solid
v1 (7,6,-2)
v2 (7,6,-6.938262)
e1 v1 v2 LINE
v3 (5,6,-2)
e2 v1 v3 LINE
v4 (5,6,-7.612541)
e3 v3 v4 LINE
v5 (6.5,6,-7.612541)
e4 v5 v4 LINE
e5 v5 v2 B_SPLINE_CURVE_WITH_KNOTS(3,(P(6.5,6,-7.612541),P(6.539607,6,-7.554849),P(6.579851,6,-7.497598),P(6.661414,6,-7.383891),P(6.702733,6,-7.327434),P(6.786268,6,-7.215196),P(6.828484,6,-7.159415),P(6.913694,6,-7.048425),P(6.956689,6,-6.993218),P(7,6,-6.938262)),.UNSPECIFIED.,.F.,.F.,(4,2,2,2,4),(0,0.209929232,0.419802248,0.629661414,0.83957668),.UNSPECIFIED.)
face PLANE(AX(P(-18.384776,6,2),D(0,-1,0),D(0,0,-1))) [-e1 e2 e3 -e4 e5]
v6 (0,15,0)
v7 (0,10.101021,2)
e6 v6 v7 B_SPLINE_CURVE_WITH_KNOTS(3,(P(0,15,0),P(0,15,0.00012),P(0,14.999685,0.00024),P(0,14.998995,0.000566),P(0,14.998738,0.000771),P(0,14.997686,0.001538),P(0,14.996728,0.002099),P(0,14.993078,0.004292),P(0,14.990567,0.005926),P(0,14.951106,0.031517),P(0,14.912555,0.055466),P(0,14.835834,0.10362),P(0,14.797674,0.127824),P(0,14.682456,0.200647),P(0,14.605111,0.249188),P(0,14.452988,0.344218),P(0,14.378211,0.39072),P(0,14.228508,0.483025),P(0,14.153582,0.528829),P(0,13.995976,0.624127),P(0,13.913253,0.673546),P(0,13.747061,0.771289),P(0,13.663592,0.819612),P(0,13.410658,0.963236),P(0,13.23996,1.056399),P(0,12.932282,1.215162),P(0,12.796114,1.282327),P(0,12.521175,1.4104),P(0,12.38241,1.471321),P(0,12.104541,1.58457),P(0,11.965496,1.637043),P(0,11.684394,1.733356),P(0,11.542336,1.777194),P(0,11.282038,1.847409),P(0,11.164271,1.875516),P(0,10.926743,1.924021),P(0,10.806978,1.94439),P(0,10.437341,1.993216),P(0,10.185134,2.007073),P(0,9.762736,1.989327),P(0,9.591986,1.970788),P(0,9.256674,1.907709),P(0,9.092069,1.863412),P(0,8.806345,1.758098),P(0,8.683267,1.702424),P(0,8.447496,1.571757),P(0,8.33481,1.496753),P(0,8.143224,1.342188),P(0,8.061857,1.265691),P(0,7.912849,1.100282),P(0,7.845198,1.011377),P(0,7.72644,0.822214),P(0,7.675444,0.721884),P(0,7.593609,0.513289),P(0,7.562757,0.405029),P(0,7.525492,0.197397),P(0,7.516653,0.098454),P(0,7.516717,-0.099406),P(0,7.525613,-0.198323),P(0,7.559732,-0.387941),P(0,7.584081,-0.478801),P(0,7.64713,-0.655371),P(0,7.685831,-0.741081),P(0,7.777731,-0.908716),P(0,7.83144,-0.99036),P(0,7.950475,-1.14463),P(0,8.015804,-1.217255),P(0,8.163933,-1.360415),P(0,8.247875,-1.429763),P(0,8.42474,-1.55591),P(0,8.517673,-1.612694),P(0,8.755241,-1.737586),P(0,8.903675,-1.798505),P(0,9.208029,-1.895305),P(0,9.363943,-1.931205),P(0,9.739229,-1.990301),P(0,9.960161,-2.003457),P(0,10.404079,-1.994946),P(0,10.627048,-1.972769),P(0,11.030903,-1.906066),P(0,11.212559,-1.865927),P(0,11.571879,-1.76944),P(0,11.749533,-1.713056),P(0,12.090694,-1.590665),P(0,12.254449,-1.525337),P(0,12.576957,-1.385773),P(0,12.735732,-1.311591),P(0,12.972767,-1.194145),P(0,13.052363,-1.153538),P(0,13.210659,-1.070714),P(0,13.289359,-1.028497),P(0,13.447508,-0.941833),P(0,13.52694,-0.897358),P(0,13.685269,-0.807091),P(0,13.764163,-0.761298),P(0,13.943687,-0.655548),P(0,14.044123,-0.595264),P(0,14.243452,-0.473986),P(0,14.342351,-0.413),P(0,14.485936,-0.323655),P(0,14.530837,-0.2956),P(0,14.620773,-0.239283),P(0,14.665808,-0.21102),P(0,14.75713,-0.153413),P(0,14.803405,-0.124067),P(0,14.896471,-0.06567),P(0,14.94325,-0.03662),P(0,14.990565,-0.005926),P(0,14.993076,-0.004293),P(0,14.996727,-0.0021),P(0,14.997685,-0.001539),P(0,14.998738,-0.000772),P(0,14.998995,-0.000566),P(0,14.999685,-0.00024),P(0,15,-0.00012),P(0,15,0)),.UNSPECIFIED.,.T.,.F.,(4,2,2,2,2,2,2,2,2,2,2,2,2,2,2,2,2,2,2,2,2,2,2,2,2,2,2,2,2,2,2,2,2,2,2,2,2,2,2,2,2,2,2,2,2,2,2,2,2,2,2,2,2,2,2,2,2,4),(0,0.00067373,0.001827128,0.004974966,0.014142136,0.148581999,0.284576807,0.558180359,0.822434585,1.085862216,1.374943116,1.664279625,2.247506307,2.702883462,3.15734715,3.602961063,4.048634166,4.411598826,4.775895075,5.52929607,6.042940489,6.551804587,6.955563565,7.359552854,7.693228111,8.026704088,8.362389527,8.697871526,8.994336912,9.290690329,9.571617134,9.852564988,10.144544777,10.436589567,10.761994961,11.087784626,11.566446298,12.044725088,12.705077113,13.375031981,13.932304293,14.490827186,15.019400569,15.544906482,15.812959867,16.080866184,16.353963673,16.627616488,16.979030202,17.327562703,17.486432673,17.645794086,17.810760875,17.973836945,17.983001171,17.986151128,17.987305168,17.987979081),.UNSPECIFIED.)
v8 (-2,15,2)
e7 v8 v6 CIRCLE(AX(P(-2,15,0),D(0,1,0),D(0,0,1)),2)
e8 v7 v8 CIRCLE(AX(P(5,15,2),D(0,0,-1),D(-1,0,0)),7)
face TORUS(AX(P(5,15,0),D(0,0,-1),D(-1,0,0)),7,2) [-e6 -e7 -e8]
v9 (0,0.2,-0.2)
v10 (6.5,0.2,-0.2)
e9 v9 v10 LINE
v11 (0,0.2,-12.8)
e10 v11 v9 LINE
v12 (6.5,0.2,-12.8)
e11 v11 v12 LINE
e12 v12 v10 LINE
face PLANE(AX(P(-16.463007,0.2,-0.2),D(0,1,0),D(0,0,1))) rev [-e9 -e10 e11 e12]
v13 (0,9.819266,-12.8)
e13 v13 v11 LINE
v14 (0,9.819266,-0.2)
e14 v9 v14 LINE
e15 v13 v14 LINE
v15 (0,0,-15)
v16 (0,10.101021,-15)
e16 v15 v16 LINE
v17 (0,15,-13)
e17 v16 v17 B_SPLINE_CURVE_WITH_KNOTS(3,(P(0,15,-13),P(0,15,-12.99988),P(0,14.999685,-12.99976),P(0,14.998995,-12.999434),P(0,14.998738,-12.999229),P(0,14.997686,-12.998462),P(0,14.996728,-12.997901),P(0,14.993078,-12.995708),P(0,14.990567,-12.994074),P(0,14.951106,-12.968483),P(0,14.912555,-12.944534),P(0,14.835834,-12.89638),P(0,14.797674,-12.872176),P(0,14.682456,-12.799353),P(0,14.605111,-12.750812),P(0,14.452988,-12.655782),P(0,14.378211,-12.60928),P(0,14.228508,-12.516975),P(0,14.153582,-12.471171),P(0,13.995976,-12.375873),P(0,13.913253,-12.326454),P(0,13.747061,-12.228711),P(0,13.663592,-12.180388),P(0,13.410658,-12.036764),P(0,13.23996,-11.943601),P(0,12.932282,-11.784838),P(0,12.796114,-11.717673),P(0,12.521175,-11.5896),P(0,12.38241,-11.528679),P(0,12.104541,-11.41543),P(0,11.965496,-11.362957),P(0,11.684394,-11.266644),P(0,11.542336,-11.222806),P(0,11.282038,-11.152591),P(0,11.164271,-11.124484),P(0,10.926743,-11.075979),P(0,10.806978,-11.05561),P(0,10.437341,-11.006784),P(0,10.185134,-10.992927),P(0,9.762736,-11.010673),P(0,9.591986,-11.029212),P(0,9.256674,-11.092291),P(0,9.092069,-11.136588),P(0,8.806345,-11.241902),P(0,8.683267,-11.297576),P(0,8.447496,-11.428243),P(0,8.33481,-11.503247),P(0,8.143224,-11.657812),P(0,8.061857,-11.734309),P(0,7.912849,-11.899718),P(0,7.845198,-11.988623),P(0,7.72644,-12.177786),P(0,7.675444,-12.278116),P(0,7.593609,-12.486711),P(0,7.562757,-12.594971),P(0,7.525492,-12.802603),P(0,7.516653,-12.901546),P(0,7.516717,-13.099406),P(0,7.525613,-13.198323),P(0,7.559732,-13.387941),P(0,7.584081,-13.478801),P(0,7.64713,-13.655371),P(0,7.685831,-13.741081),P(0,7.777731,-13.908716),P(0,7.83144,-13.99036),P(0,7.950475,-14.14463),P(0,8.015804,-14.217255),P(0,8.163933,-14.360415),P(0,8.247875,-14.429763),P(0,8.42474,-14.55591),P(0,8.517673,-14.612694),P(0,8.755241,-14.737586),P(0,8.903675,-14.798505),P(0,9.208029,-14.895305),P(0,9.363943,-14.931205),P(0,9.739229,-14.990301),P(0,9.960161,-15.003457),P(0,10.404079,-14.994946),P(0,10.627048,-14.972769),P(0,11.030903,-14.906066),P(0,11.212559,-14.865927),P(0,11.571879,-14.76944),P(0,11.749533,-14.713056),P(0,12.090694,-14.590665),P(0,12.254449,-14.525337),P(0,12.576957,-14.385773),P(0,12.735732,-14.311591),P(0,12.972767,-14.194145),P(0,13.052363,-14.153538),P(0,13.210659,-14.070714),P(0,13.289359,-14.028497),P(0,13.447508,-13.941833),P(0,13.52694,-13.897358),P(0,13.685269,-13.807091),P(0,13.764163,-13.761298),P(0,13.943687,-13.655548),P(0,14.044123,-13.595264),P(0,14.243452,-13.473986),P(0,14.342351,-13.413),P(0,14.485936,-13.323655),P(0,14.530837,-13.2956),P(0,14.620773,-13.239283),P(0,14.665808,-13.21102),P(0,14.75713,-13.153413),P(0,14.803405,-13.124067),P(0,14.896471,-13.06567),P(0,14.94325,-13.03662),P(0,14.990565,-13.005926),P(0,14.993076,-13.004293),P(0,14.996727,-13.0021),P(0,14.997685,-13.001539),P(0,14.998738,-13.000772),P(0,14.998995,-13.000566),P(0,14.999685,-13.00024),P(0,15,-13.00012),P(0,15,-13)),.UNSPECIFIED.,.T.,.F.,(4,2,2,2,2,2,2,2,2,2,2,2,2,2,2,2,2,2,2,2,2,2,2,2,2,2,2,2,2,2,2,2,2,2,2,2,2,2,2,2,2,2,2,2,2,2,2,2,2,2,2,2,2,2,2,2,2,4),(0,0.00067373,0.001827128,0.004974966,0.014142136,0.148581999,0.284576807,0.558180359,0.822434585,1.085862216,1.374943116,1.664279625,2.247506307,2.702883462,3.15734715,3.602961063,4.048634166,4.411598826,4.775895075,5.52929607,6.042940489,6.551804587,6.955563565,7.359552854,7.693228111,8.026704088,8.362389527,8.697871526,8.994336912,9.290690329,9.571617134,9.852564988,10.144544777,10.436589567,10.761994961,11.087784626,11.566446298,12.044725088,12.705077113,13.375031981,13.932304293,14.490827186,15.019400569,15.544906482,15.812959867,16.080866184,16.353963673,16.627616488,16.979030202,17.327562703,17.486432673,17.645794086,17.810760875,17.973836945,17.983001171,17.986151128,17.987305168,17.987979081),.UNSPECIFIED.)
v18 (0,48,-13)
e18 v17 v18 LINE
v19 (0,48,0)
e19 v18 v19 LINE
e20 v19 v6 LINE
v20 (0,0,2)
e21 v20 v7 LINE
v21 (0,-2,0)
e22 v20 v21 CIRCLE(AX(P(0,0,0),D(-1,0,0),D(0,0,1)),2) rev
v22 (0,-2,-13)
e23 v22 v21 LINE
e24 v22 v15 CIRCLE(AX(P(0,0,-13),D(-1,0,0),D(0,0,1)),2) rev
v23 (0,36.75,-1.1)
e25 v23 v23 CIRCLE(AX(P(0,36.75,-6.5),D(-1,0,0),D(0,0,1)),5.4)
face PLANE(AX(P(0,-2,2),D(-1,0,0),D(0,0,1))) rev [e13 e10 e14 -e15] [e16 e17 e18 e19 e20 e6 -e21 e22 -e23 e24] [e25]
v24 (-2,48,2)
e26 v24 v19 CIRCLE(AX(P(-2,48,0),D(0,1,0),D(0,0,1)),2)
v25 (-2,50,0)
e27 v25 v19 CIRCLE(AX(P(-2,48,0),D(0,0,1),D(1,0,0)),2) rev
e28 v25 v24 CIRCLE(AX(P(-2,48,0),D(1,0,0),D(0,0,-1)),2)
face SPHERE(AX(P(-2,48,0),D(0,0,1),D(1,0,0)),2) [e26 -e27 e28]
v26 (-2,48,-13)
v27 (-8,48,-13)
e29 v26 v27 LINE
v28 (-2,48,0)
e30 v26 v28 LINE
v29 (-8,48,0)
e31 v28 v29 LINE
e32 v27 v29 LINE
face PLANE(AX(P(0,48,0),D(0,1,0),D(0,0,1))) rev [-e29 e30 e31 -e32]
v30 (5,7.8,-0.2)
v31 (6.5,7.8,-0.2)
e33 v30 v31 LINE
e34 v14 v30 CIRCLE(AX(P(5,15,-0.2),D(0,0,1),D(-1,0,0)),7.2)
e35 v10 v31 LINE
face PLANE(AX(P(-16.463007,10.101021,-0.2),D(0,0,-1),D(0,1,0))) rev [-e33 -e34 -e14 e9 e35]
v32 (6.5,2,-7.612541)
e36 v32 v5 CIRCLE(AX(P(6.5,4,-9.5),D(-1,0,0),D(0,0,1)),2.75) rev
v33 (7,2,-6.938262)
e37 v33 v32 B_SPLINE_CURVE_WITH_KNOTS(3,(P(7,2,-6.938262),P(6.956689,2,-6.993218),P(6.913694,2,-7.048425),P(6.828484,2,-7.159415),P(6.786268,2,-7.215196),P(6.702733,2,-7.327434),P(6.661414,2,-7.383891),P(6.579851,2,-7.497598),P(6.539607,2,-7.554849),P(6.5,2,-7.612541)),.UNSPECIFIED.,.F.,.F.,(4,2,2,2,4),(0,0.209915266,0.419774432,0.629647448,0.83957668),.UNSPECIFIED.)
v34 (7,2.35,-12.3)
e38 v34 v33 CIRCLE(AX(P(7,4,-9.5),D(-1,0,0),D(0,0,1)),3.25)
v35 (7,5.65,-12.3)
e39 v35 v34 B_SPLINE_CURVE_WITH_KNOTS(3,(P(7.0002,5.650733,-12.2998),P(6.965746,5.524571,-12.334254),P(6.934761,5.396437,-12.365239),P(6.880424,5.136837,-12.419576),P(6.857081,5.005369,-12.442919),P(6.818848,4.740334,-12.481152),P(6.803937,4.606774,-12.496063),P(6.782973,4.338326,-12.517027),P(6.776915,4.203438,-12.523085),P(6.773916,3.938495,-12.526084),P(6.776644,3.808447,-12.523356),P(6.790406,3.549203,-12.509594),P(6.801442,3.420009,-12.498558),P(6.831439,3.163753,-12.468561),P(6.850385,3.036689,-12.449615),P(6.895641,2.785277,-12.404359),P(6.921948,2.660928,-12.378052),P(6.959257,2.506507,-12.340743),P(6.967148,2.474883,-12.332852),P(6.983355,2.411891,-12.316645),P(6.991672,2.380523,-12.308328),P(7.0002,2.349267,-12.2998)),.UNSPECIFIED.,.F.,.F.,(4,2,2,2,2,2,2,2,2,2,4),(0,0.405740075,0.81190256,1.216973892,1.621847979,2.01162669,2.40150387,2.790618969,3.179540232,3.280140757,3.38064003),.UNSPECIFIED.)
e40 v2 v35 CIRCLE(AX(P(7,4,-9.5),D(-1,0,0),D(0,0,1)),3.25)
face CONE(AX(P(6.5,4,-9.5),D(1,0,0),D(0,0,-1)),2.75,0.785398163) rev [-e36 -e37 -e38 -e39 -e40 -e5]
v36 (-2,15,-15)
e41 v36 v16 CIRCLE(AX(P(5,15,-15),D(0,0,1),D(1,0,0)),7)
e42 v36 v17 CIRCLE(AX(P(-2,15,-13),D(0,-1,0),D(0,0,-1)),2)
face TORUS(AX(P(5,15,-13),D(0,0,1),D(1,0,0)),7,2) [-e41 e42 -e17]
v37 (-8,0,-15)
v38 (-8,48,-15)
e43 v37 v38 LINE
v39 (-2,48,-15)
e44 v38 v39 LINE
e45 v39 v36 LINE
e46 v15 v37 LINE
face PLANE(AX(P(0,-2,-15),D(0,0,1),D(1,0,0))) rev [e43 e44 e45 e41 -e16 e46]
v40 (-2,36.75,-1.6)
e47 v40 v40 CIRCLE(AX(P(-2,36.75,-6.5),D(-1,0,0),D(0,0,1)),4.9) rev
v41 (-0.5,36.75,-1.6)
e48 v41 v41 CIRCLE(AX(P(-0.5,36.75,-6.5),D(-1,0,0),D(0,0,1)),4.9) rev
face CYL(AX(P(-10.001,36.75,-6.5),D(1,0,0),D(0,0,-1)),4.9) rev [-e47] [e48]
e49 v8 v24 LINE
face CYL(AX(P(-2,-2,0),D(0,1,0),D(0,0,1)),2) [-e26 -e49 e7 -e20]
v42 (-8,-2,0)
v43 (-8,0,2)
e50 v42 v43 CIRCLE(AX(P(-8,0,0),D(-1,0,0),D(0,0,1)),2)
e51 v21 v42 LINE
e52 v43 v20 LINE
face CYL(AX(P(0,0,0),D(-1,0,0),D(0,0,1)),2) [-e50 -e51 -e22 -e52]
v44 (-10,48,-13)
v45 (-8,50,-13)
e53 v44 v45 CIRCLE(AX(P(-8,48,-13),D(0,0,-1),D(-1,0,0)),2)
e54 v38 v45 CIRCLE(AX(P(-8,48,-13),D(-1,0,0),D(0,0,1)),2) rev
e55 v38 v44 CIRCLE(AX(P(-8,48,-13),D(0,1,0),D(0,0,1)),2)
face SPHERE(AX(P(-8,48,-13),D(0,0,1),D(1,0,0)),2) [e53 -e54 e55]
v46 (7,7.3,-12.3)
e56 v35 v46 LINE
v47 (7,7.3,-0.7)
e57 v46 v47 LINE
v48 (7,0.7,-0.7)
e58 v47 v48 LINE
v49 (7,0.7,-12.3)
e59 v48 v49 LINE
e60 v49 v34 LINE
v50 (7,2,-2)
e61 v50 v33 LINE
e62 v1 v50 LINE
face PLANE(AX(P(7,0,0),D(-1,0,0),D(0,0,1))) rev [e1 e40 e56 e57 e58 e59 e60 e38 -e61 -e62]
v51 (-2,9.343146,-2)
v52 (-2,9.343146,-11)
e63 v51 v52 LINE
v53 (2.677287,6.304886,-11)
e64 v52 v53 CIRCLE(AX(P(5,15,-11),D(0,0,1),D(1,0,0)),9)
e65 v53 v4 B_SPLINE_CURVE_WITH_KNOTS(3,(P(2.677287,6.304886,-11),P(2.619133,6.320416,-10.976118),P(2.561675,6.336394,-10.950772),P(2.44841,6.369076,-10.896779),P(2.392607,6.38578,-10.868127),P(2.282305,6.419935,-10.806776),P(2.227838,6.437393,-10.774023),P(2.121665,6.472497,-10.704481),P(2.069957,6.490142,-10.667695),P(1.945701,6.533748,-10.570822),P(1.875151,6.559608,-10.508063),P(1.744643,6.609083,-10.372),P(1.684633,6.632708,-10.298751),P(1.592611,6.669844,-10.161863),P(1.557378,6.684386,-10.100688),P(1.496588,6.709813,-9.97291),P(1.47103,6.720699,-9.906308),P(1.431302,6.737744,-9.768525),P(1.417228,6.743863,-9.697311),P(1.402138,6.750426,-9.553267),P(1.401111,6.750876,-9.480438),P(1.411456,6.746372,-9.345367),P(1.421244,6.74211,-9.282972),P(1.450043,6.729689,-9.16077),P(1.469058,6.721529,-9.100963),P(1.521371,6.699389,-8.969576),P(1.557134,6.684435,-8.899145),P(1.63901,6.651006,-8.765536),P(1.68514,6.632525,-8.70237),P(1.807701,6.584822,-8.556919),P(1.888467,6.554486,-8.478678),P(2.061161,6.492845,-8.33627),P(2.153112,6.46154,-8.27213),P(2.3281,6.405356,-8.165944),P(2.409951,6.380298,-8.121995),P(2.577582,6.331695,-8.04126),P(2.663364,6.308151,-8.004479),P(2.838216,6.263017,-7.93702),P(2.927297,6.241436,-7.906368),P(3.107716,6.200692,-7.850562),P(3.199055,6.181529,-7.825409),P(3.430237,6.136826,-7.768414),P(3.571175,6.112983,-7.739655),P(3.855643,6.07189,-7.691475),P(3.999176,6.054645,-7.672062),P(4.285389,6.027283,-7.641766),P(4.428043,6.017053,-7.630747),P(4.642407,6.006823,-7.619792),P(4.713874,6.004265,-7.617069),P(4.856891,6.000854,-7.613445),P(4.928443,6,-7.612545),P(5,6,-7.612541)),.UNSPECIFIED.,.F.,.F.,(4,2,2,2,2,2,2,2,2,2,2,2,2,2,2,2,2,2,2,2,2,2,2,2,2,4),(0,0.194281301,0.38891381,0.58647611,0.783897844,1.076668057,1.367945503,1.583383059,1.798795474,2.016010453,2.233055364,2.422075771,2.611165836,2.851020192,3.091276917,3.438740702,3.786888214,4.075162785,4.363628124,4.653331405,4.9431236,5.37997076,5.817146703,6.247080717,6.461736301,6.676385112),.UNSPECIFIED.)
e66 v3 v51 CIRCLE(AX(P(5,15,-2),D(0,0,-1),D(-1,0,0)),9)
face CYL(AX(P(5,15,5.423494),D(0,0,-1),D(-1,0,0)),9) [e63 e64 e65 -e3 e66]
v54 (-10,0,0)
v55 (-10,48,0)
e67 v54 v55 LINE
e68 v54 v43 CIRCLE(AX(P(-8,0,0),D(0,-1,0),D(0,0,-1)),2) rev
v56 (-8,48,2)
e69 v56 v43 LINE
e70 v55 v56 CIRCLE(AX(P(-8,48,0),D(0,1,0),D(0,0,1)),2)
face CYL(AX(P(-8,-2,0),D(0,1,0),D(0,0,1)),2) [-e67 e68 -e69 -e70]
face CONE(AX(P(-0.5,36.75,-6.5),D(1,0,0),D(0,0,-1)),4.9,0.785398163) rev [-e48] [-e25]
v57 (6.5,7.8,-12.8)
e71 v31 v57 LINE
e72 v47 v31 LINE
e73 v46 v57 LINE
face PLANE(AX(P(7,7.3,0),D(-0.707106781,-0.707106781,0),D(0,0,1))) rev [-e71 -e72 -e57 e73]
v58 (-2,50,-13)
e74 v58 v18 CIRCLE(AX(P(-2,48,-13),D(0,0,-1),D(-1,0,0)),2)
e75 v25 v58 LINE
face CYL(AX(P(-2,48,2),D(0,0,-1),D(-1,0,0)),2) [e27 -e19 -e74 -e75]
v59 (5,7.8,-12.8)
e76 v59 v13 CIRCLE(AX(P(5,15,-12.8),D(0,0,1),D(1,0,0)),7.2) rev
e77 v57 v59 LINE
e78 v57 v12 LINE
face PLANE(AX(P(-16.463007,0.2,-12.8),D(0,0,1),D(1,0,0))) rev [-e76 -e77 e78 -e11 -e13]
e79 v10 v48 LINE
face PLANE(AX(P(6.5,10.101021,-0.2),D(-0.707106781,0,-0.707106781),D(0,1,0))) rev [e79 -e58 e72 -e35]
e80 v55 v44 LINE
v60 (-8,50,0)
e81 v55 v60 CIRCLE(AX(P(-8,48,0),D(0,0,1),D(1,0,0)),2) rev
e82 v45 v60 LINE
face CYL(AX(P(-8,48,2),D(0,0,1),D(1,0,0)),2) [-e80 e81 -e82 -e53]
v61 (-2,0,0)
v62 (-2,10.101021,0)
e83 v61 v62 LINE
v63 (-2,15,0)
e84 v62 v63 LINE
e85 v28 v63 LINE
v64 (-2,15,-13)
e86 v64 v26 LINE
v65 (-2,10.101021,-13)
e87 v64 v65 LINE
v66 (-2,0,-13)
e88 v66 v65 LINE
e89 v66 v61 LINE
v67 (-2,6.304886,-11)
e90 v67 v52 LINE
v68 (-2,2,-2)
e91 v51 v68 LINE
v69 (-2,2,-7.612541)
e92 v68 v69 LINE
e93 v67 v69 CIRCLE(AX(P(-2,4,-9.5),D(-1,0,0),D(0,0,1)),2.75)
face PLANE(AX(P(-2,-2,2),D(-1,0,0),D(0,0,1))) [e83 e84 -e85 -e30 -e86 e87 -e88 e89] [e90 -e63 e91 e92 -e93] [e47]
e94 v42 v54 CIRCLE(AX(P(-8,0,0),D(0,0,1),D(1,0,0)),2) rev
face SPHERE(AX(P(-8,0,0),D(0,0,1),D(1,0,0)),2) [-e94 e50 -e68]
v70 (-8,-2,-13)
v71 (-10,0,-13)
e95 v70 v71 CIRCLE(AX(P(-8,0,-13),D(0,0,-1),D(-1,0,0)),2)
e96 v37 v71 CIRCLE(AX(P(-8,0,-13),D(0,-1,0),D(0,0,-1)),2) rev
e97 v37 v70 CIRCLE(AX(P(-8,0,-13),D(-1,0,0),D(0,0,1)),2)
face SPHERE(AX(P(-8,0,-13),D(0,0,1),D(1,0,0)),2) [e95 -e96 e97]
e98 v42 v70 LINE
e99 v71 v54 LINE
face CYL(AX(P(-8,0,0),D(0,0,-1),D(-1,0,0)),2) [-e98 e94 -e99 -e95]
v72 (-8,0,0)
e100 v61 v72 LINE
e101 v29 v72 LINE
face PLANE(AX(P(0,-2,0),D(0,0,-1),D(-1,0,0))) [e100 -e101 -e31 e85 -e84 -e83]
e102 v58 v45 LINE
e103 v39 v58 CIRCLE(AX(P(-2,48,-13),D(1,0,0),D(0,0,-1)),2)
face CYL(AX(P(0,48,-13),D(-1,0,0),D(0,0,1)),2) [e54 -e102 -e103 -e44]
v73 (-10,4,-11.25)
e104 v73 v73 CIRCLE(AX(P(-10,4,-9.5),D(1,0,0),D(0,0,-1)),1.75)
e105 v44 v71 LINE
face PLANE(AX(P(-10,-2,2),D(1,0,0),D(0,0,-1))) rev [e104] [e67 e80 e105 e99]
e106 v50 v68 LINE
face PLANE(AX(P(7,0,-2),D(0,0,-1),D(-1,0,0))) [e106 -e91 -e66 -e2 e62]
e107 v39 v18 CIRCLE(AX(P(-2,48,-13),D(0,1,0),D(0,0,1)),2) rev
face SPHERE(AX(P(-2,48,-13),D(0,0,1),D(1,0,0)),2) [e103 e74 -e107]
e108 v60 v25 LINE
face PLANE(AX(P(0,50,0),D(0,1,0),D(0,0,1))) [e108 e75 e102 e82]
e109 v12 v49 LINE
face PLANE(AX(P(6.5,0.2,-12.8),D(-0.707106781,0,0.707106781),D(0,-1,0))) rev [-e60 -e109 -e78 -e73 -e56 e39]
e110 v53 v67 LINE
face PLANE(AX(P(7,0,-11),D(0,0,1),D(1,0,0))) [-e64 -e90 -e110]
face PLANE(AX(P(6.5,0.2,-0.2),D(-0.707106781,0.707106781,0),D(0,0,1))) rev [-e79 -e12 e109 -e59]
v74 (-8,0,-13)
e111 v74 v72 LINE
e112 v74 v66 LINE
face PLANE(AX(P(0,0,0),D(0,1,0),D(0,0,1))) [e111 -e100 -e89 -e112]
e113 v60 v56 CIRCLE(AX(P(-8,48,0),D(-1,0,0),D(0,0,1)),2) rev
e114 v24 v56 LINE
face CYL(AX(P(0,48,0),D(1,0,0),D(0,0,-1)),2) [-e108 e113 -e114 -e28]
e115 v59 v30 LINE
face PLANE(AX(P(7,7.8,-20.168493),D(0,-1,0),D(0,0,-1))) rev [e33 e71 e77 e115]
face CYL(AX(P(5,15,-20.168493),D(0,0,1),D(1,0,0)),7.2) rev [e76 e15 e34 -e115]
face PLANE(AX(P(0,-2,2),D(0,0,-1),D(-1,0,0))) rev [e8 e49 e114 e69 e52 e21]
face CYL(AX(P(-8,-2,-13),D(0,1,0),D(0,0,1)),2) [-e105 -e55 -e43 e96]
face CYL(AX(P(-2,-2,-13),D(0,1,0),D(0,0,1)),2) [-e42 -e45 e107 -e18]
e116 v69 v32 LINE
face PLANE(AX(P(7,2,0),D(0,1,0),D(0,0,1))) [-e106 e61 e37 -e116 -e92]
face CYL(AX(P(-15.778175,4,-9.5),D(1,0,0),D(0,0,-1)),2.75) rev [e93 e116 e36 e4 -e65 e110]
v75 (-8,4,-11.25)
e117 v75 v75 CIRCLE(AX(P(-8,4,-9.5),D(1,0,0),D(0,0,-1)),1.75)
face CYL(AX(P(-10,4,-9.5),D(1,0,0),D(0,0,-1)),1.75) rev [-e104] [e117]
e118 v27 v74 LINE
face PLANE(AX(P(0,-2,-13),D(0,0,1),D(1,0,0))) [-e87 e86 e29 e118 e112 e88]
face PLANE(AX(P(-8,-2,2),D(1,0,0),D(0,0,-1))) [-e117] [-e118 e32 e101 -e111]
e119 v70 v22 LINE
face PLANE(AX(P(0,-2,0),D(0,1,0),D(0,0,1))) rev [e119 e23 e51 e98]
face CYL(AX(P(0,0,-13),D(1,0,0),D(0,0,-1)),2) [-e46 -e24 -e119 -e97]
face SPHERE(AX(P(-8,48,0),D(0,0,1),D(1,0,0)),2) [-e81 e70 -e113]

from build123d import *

# Parameters (mm, degrees)
SKETCH1_W                = 13
SKETCH1_H                = 8
BOSS_EXTRUDE1_DEPTH      = 7
BOSS_EXTRUDE2_DEPTH      = 2
BOSS_EXTRUDE2_DEPTH_BACK = 50
SKETCH2_W                = 10
SKETCH2_H                = 17
BOSS_EXTRUDE3_REACH      = 56.9
SKETCH3_W                = 17
SKETCH3_H                = 2
FILLET4_R                = 5
FILLET3_R                = 2
SKETCH4_W                = 17
SKETCH4_H                = 7
CUT_EXTRUDE1_DEPTH       = 7
BOSS_EXTRUDE4_DEPTH      = 13
SHELL1_START             = -13
SHELL1_OUTLINE_W         = 6
SHELL1_OUTLINE_H         = 48
SHELL1_DEPTH             = 13
SHELL1_START_2           = -11
SHELL1_2_DEPTH           = 9
CUT_EXTRUDE2_REACH       = 55.151
SKETCH6_R                = 4.9
CHAMFER1_SIZE            = 0.5
CUT_EXTRUDE3_REACH       = 56.9
SKETCH7_R                = 2.75
SKETCH8_R                = 1.75
CUT_EXTRUDE4_DEPTH       = 55.899908953
CUT_EXTRUDE5_REACH       = 56.9
CUT_EXTRUDE6_START       = -12.6
CUT_EXTRUDE6_DEPTH       = 12.6
CHAMFER2_SIZE            = 0.5


# Read off the part's stored shape, not the designer's step: Shell1
# Some blends are built 0.0001 mm under size
with BuildPart() as part:
    # Sketch1 → Boss-Extrude1 (new body)
    with BuildSketch(Plane(origin=(0, 0, 0), x_dir=(0, 0, -1), z_dir=(1, 0, 0))):
        with Locations((6.5, 4)):
            Rectangle(SKETCH1_W, SKETCH1_H)
    extrude(amount=BOSS_EXTRUDE1_DEPTH)

    # Sketch2 → Boss-Extrude2 (add, two sides: drawn at the far end of the back side and taken through both)
    with BuildSketch(Plane(origin=(0, 0, 0), x_dir=(-1, 0, 0), z_dir=(0, -1, 0)).offset(-BOSS_EXTRUDE2_DEPTH_BACK)):
        with Locations((5, 6.5)):
            Rectangle(SKETCH2_W, SKETCH2_H)
    extrude(amount=BOSS_EXTRUDE2_DEPTH + BOSS_EXTRUDE2_DEPTH_BACK)

    # Sketch3 → Boss-Extrude3 (add, up to next)
    with BuildSketch(Plane(origin=(7, 0, 0), x_dir=(0, 0, -1), z_dir=(1, 0, 0)), mode=Mode.PRIVATE) as boss_extrude3_sk1:
        with Locations((6.5, 9)):
            Rectangle(SKETCH3_W, SKETCH3_H)
    boss_extrude3_tool1 = extrude(boss_extrude3_sk1.sketch, amount=-BOSS_EXTRUDE3_REACH, mode=Mode.PRIVATE) - part.part
    add(boss_extrude3_tool1.solids().sort_by_distance((7, 9, -6.5))[0])

    # Fillet4
    fillet4_edges = [part.edges().sort_by_distance(p)[0] for p in [
        (0, 10, -6.5),
    ]]
    fillet(fillet4_edges, radius=FILLET4_R)

    # Fillet3
    fillet3_edges = [part.edges().sort_by_distance(p)[0] for p in [
        (-5, 50, -15),
        (-10, 50, -6.5),
        (-5, 50, 2),
        (0, 50, -6.5),
        (-10, 24, 2),
        (-5, -2, 2),
        (-10, 24, -15),
        (-10, -2, -6.5),
        (-5, -2, -15),
        (6, 10, -15),
        (1.464466094, 11.464466094, -15),
        (6, 10, 2),
        (1.464466094, 11.464466094, 2),
        (0, 32.5, -15),
        (0, 32.5, 2),
    ]]
    fillet(fillet3_edges, radius=FILLET3_R - 0.0001)  # a hair under: the kernel refuses the full size

    # Sketch4 → Cut-Extrude1 (cut)
    with BuildSketch(Plane(origin=(7, 0, 0), x_dir=(0, 0, -1), z_dir=(1, 0, 0))):
        with Locations((6.5, 11.5)):
            Rectangle(SKETCH4_W, SKETCH4_H)
    extrude(amount=-CUT_EXTRUDE1_DEPTH, mode=Mode.SUBTRACT)

    # Sketch5 → Boss-Extrude4 (add)
    with BuildSketch(Plane(origin=(0, 0, -13), x_dir=(-1, 0, 0), z_dir=(0, 0, -1))):
        with BuildLine():
            Line((0, 8), (-5, 8))
            ThreePointArc((-5, 8), (-2.288252998, 8.546595612), (0, 10.101020514))
            Line((0, 10.101020514), (0, 8))
        make_face()
    extrude(amount=-BOSS_EXTRUDE4_DEPTH)

    # Shell1 outline → Shell1 (cut)
    with BuildSketch(Plane.XY.offset(SHELL1_START)):
        with Locations((-5, 24)):
            Rectangle(SHELL1_OUTLINE_W, SHELL1_OUTLINE_H)
    extrude(amount=SHELL1_DEPTH, mode=Mode.SUBTRACT)

    # Shell1 2 outline → Shell1 2 (cut)
    with BuildSketch(Plane.XY.offset(SHELL1_START_2)):
        with BuildLine():
            Line((-2, 2), (7, 2))
            Line((7, 2), (7, 6))
            Line((7, 6), (5, 6))
            ThreePointArc((5, 6), (1.121320343, 6.878679656), (-2, 9.343145751))
            Line((-2, 9.343145751), (-2, 2))
        make_face()
    extrude(amount=SHELL1_2_DEPTH, mode=Mode.SUBTRACT)

    # Sketch6 → Cut-Extrude2 (cut, up to next)
    with BuildSketch(Plane(origin=(0, 0, 0), x_dir=(0, 0, -1), z_dir=(1, 0, 0)), mode=Mode.PRIVATE) as cut_extrude2_sk1:
        with Locations((6.5, 36.75)):
            Circle(SKETCH6_R)
    cut_extrude2_tool1 = extrude(cut_extrude2_sk1.sketch, amount=-CUT_EXTRUDE2_REACH, mode=Mode.PRIVATE) & part.part
    add(cut_extrude2_tool1.solids().sort_by_distance((0, 36.75, -6.5))[0], mode=Mode.SUBTRACT)

    # Chamfer1
    chamfer1_edges = [part.edges().sort_by_distance(p)[0] for p in [
        (0, 36.75, -1.6),
    ]]
    chamfer(chamfer1_edges, length=CHAMFER1_SIZE)

    # Cut-Extrude3: up to this face of the body (flat: up to its plane)
    cut_extrude3_end = Plane(part.part.faces().sort_by_distance((-8, 24, -6.5))[0])
    # Sketch7 → Cut-Extrude3 (cut, up to the picked face)
    with BuildSketch(Plane(origin=(7, 0, 0), x_dir=(0, 0, -1), z_dir=(1, 0, 0)), mode=Mode.PRIVATE) as cut_extrude3_sk1:
        with Locations((9.5, 4)):
            Circle(SKETCH7_R)
    cut_extrude3_tool1 = split(extrude(cut_extrude3_sk1.sketch, amount=-CUT_EXTRUDE3_REACH, mode=Mode.PRIVATE), bisect_by=cut_extrude3_end, keep=Keep.BOTH, mode=Mode.PRIVATE)
    add(cut_extrude3_tool1.solids().sort_by(Axis((7, 4, -9.5), (-1, 0, 0)))[0], mode=Mode.SUBTRACT)

    # Sketch8 → Cut-Extrude4 (cut, through all)
    with BuildSketch(Plane(origin=(7, 0, 0), x_dir=(0, 0, -1), z_dir=(1, 0, 0))):
        with Locations((9.5, 4)):
            Circle(SKETCH8_R)
    extrude(amount=-CUT_EXTRUDE4_DEPTH, mode=Mode.SUBTRACT)

    # Cut-Extrude5: up to this face of the body (flat: up to its plane)
    cut_extrude5_end = Plane(part.part.faces().sort_by_distance((0, 23.174375266, -6.49999999))[0])
    # Sketch9 → Cut-Extrude5 (cut, up to the picked face)
    with BuildSketch(Plane(origin=(7, 0, 0), x_dir=(0, 0, -1), z_dir=(1, 0, 0)), mode=Mode.PRIVATE) as cut_extrude5_sk1:
        Polygon((0, 10.101020514), (0.2, 10.101020514), (0.2, 0.2), (12.8, 0.2), (12.8, 10.101020514), (13, 10.101020514), (13, 0), (0, 0), align=None)
    cut_extrude5_tool1 = split(extrude(cut_extrude5_sk1.sketch, amount=-CUT_EXTRUDE5_REACH, mode=Mode.PRIVATE), bisect_by=cut_extrude5_end, keep=Keep.BOTH, mode=Mode.PRIVATE)
    add(cut_extrude5_tool1.solids().sort_by(Axis((7, 9.93639, -0.1), (-1, 0, 0)))[0], mode=Mode.SUBTRACT)

    # Sketch10 → Cut-Extrude6 (cut)
    with BuildSketch(Plane.XY.offset(-0.2).offset(CUT_EXTRUDE6_START)):
        with BuildLine():
            Line((7, 8), (5, 8))
            ThreePointArc((5, 8), (2.288252998, 8.546595612), (0, 10.101020514))
            Line((0, 10.101020514), (0, 9.819266461))
            ThreePointArc((0, 9.819266461), (2.303825069, 8.32387532), (5, 7.8))
            Line((5, 7.8), (7, 7.8))
            Line((7, 7.8), (7, 8))
        make_face()
    extrude(amount=CUT_EXTRUDE6_DEPTH, mode=Mode.SUBTRACT)

    # Chamfer2
    # the kernel refuses this chamfer: 0.5 mm, written as the material it takes off along each edge
    with BuildSketch(Plane(origin=(7, 4, -9.5), x_dir=(0, 0.33829869190957257, 0.9410387850945741), z_dir=(0, -0.9410387850945741, 0.33829869190957257))) as chamfer2_piece_1:
        Polygon((2.75 + CHAMFER2_SIZE, 0), (2.75, CHAMFER2_SIZE), (2.75, 0), align=None)
    revolve(axis=Axis((7, 4, -9.5), (-1, 0, 0)), revolution_arc=320.453489915, mode=Mode.SUBTRACT)
    with BuildSketch(Plane(origin=(7, 0.2, 1.085841494), x_dir=(-0.9996219169112968, -0.027495876610586403, 0), z_dir=(0, 0, -1))) as chamfer2_piece_2:
        Polygon((CHAMFER2_SIZE * 0.999621916911, CHAMFER2_SIZE * 0.0274958766106), (-CHAMFER2_SIZE * 0.0274958766106, CHAMFER2_SIZE * 0.999621916911), (0, 0), align=None)
    extrude(amount=15.171682988, mode=Mode.SUBTRACT)
    with BuildSketch(Plane(origin=(7, 9.085841494, -0.2), x_dir=(-0.9996219169112968, 0, 0.027495876610586403), z_dir=(0, -1, 0)), Plane(origin=(7, -1.085841494, -12.8), x_dir=(-0.9996219169112968, 0, -0.027495876610585647), z_dir=(0, 1, 0))) as chamfer2_piece_3:
        Polygon((CHAMFER2_SIZE * 0.999621916911, CHAMFER2_SIZE * 0.0274958766106), (-CHAMFER2_SIZE * 0.0274958766106, CHAMFER2_SIZE * 0.999621916911), (0, 0), align=None)
    extrude(amount=10.171682988, mode=Mode.SUBTRACT)
    with BuildSketch(Plane(origin=(7, 7.8, -14.085841494), x_dir=(0.027495876610585647, -0.9996219169112968, 0), z_dir=(0, 0, 1))) as chamfer2_piece_4:
        Polygon((CHAMFER2_SIZE * 0.999621916911, -CHAMFER2_SIZE * 0.0274958766106), (-CHAMFER2_SIZE * 0.0274958766106, -CHAMFER2_SIZE * 0.999621916911), (0, 0), align=None)
    extrude(amount=15.171682988, mode=Mode.SUBTRACT)


solid = part.part
